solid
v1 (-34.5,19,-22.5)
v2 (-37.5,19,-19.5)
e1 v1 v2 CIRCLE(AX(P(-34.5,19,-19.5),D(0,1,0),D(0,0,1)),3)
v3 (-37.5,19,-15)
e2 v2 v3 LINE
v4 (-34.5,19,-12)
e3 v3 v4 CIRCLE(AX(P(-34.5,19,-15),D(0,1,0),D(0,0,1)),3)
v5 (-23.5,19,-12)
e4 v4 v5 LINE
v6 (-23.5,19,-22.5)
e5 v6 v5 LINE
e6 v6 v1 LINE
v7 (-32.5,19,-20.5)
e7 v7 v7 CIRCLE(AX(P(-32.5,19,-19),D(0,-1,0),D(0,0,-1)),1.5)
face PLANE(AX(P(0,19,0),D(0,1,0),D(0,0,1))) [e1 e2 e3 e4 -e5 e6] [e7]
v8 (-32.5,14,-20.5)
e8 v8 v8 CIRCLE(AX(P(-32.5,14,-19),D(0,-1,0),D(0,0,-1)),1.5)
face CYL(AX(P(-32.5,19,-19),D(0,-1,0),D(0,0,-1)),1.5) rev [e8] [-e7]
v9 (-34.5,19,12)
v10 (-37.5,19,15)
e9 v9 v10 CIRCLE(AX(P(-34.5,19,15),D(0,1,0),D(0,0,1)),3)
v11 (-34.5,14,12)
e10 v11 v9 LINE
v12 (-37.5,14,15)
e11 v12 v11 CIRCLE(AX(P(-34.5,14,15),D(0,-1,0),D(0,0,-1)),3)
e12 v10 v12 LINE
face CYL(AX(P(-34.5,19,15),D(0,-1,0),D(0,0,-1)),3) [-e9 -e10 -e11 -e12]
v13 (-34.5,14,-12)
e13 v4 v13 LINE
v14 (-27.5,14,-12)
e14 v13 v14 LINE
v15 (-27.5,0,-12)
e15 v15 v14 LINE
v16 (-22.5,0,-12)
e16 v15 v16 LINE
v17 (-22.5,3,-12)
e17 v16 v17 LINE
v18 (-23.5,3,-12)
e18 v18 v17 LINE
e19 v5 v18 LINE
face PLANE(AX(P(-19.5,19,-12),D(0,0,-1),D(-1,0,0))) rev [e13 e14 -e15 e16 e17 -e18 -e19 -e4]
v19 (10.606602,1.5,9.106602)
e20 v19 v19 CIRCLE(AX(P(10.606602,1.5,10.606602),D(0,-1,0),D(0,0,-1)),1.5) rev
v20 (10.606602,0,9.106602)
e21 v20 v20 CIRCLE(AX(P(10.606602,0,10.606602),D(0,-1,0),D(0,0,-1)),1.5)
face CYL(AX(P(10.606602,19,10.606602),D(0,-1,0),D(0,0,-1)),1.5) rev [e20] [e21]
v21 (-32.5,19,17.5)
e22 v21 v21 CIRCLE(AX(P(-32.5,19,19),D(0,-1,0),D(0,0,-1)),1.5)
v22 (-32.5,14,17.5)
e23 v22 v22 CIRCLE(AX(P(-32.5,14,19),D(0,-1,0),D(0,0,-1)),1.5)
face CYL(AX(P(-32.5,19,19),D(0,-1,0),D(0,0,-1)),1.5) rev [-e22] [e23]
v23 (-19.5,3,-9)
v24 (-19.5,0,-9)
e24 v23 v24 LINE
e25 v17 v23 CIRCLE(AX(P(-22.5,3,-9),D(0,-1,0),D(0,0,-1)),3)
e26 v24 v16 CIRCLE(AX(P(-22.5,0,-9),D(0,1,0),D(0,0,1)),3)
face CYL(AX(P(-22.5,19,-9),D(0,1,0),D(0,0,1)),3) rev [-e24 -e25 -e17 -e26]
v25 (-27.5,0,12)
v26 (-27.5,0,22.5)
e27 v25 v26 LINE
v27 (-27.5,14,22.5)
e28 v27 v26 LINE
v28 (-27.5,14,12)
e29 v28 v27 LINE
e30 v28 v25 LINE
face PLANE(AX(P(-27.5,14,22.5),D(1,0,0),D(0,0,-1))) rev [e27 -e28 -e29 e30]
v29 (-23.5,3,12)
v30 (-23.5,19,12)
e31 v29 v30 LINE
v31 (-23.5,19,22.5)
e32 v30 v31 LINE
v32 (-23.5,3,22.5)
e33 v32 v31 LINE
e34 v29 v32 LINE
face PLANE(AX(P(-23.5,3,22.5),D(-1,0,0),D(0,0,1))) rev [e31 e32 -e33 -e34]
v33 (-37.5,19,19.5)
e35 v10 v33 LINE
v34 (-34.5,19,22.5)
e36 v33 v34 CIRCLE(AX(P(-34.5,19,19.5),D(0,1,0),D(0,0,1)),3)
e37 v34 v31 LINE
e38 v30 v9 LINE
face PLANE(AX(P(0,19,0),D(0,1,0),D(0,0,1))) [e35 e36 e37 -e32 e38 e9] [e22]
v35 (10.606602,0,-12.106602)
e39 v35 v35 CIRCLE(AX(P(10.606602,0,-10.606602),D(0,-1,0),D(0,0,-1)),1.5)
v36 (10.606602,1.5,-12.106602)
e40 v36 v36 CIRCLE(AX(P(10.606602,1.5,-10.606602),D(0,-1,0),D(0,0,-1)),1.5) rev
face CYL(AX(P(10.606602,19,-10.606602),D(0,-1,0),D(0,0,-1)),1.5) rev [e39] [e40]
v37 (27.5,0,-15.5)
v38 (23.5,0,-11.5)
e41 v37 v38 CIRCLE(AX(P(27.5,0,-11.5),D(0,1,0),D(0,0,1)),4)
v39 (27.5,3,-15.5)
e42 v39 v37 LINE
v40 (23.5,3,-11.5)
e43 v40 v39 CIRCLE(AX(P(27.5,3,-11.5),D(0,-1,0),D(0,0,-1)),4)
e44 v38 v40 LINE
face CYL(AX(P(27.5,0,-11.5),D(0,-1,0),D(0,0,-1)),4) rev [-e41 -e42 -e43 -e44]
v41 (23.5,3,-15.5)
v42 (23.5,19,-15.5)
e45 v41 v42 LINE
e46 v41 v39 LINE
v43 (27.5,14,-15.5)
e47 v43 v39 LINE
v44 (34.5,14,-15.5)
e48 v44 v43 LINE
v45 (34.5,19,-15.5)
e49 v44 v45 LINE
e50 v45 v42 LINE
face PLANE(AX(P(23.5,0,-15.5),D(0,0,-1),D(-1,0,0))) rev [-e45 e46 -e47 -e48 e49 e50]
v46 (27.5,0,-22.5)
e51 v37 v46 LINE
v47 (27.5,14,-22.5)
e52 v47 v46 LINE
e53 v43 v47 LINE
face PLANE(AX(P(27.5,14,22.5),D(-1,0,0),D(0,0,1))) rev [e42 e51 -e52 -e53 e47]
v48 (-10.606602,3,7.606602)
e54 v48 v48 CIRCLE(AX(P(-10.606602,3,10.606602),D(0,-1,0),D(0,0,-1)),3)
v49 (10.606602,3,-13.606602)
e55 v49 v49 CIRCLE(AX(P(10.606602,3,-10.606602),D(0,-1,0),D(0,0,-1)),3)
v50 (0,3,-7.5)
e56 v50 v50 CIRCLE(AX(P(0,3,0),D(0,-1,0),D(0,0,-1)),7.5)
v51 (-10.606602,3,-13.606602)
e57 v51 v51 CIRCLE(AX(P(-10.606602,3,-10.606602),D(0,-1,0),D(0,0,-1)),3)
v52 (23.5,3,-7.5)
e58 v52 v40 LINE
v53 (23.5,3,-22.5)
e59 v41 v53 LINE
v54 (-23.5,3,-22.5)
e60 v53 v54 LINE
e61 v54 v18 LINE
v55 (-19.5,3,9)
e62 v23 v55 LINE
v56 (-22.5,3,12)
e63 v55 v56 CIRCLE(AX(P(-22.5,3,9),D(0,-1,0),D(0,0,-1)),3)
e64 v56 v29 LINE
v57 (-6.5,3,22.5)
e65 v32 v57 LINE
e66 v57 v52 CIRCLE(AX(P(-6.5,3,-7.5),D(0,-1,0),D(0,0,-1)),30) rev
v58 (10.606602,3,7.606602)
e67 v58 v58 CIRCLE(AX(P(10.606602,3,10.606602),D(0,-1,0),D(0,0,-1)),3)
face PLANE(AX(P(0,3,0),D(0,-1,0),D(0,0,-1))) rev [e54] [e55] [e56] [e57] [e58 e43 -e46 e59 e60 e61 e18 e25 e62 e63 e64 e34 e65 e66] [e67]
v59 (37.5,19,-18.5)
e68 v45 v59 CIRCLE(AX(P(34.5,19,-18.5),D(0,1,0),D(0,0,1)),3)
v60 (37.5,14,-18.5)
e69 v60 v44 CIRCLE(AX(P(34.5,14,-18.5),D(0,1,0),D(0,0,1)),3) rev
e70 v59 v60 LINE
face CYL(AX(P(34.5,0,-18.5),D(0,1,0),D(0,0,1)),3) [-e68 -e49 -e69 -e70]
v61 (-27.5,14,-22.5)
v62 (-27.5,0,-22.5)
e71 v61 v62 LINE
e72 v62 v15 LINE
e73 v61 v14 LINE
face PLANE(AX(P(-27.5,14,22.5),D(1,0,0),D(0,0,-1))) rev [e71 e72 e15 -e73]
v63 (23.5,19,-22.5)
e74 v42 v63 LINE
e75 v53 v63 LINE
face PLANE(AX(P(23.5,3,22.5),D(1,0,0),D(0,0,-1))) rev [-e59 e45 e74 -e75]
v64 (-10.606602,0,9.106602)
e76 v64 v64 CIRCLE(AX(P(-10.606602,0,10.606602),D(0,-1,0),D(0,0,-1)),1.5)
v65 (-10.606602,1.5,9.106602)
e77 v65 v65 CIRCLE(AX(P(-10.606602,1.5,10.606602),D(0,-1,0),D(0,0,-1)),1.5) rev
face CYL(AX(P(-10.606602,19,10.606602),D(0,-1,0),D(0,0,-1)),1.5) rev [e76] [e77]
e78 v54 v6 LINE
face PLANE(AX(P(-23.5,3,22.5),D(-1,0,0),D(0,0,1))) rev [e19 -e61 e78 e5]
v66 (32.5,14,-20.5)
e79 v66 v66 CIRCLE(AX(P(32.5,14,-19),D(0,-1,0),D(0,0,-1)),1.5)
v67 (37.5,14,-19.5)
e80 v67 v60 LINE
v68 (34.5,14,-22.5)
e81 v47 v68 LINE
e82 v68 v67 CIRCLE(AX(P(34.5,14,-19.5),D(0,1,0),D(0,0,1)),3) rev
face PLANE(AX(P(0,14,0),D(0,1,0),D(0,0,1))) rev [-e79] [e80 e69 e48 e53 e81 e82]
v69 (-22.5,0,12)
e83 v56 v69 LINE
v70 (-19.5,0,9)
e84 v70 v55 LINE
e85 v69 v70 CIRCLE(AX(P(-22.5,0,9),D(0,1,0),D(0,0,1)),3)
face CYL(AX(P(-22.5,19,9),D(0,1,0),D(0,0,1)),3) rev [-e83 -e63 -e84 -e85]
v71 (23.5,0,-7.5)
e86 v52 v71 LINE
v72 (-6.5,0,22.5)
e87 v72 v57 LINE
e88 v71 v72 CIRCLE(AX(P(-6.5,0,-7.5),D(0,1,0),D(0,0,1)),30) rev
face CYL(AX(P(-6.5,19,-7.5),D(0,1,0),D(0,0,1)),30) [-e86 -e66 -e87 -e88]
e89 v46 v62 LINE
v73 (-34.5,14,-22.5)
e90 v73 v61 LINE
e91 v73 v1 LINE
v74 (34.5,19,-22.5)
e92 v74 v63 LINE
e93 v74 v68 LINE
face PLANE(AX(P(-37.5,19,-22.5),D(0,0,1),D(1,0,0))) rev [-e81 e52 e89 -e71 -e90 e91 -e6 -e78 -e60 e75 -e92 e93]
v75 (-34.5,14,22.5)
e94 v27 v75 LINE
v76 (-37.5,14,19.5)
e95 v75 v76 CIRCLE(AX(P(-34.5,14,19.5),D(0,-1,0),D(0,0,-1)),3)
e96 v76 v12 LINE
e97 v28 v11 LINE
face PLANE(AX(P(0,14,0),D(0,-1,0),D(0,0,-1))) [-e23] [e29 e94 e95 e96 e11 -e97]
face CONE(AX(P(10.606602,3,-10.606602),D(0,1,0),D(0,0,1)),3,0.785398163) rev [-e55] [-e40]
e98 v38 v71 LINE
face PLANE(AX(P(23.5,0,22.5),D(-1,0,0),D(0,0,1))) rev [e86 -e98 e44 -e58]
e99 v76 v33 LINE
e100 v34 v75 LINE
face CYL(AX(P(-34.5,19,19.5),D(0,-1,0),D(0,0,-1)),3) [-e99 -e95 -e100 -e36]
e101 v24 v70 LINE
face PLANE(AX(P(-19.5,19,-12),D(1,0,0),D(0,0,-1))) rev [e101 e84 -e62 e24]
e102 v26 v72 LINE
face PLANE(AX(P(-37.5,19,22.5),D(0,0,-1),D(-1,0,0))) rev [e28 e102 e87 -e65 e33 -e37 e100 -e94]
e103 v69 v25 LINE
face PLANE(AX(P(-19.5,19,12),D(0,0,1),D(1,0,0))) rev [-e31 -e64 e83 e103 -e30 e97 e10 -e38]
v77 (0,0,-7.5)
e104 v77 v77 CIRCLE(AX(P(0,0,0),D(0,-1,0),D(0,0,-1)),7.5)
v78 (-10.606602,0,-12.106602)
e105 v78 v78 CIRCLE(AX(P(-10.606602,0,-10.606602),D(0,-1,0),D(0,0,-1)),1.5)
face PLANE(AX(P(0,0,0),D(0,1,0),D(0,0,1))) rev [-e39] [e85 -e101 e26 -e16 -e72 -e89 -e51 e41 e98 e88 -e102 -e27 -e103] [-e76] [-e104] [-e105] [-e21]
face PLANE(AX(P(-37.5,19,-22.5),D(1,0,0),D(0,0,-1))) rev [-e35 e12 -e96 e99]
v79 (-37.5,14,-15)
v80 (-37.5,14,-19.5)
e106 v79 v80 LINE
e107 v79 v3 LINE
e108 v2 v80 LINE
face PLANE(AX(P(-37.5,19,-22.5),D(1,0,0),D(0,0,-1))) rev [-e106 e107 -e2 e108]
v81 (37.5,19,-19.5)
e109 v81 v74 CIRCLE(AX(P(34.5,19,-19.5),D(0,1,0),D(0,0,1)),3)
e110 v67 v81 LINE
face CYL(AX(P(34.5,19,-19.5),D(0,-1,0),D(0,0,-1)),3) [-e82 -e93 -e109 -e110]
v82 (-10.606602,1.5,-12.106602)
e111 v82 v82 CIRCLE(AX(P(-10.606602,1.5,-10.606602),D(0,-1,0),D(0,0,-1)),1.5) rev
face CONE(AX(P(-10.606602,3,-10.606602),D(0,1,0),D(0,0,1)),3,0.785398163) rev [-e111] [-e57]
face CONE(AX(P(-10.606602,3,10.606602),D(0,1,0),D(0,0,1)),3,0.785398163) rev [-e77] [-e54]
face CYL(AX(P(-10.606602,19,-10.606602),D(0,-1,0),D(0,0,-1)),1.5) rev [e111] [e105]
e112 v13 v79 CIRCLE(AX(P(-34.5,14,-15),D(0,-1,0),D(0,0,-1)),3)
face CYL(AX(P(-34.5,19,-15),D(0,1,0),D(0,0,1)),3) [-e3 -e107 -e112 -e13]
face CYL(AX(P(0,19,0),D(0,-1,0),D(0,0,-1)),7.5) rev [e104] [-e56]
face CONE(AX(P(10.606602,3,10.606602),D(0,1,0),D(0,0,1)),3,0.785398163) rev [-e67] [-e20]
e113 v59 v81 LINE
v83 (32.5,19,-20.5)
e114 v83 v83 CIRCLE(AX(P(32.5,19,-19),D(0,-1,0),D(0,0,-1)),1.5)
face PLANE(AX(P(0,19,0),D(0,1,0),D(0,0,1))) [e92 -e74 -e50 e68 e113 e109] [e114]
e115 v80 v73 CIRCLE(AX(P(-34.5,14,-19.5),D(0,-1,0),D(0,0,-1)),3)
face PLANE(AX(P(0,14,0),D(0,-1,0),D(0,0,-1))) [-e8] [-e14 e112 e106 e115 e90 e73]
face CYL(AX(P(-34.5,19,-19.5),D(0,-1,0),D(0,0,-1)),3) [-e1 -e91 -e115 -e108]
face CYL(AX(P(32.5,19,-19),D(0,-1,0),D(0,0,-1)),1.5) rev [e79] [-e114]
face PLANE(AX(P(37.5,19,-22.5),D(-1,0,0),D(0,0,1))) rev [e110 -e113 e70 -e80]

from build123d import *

# Parameters (mm, degrees)
SKETCH_1_W          = 75
SKETCH_1_H          = 45
EXTRUDE_1_DEPTH     = 19
SKETCH_2_W          = 10
SKETCH_2_H          = 45
CUT_EXTRUDE_1_DEPTH = 14
SKETCH_3_W          = 47
SKETCH_3_H          = 45
CUT_EXTRUDE_2_DEPTH = 16
SKETCH_4_R          = 1.5
SKETCH_4_R_2        = 7.5
CUT_EXTRUDE_3_DEPTH = 48.681233206
SKETCH_5_W          = 14
SKETCH_5_H          = 38
CUT_EXTRUDE_4_DEPTH = 48.681233206
FILLET_1_R          = 30
CHAMFER_1_SIZE      = 1.5
SKETCH_8_W          = 36
SKETCH_8_H          = 24
CUT_EXTRUDE_6_DEPTH = 48.681233206
FILLET_2_R          = 3
SKETCH_9_R          = 1.5
CUT_EXTRUDE_7_DEPTH = 46.918405896
FILLET_3_R          = 3
FILLET_4_R          = 4


with BuildPart() as part:
    # 草图1 → 凸台-拉伸1 (new body)
    with BuildSketch(Plane(origin=(0, 0, 0), x_dir=(1, 0, 0), z_dir=(0, 1, 0))):
        Rectangle(SKETCH_1_W, SKETCH_1_H)
    extrude(amount=EXTRUDE_1_DEPTH)

    # 草图2 → 切除-拉伸1 (cut)
    with BuildSketch(Plane.XZ):
        with Locations((-32.5, 0)):
            Rectangle(SKETCH_2_W, SKETCH_2_H)
        with Locations((32.5, 0)):
            Rectangle(SKETCH_2_W, SKETCH_2_H)
    extrude(amount=-CUT_EXTRUDE_1_DEPTH, mode=Mode.SUBTRACT)

    # 草图3 → 切除-拉伸2 (cut)
    with BuildSketch(Plane(origin=(0, 19, 0), x_dir=(1, 0, 0), z_dir=(0, 1, 0))):
        Rectangle(SKETCH_3_W, SKETCH_3_H)
    extrude(amount=-CUT_EXTRUDE_2_DEPTH, mode=Mode.SUBTRACT)

    # 草图4 → 切除-拉伸3 (cut, through all)
    with BuildSketch(Plane.XZ):
        with Locations(Location((10.606601718, 10.606601718, 0), (0, 0, 270))):
            Circle(SKETCH_4_R)
        with Locations(Location((10.606601718, -10.606601718, 0), (0, 0, 270))):
            Circle(SKETCH_4_R)
        with Locations(Location((-10.606601718, -10.606601718, 0), (0, 0, 270))):
            Circle(SKETCH_4_R)
        with Locations(Location((-10.606601718, 10.606601718, 0), (0, 0, 270))):
            Circle(SKETCH_4_R)
        with Locations(Location((0, 0, 0), (0, 0, 270))):
            Circle(SKETCH_4_R_2)
    extrude(amount=-CUT_EXTRUDE_3_DEPTH, mode=Mode.SUBTRACT)

    # 草图5 → 切除-拉伸4 (cut, through all)
    with BuildSketch(Plane(origin=(0, 19, 0), x_dir=(1, 0, 0), z_dir=(0, 1, 0))):
        with Locations((30.5, -3.5)):
            Rectangle(SKETCH_5_W, SKETCH_5_H)
    extrude(amount=-CUT_EXTRUDE_4_DEPTH, mode=Mode.SUBTRACT)

    # 圆角1
    fillet_1_edges = [part.edges().sort_by_distance(p)[0] for p in [
        (23.5, 1.5, 22.5),
    ]]
    fillet(fillet_1_edges, radius=FILLET_1_R)

    # 倒角1
    chamfer_1_edges = [part.edges().sort_by_distance(p)[0] for p in [
        (-10.606601718, 3, 12.106601718),
        (-10.606601718, 3, -9.106601718),
        (10.606601718, 3, -9.106601718),
        (10.606601718, 3, 12.106601718),
    ]]
    chamfer(chamfer_1_edges, length=CHAMFER_1_SIZE)

    # 草图8 → 切除-拉伸6 (cut, through all)
    with BuildSketch(Plane.XZ):
        with Locations((-37.5, 0)):
            Rectangle(SKETCH_8_W, SKETCH_8_H)
    extrude(amount=-CUT_EXTRUDE_6_DEPTH, mode=Mode.SUBTRACT)

    # 圆角2
    fillet_2_edges = [part.edges().sort_by_distance(p)[0] for p in [
        (-19.5, 1.5, 12),
        (-19.5, 1.5, -12),
    ]]
    fillet(fillet_2_edges, radius=FILLET_2_R)

    # 草图9 → 切除-拉伸7 (cut, through all)
    with BuildSketch(Plane.XZ.offset(-14)):
        with Locations(Location((32.5, -19, 0), (0, 0, 270))):
            Circle(SKETCH_9_R)
        with Locations(Location((-32.5, -19, 0), (0, 0, 270))):
            Circle(SKETCH_9_R)
        with Locations(Location((-32.5, 19, 0), (0, 0, 270))):
            Circle(SKETCH_9_R)
    extrude(amount=-CUT_EXTRUDE_7_DEPTH, mode=Mode.SUBTRACT)

    # 圆角3
    fillet_3_edges = [part.edges().sort_by_distance(p)[0] for p in [
        (-37.5, 16.5, 12),
        (-37.5, 16.5, -12),
        (-37.5, 16.5, 22.5),
        (-37.5, 16.5, -22.5),
        (37.5, 16.5, -22.5),
        (37.5, 16.5, -15.5),
    ]]
    fillet(fillet_3_edges, radius=FILLET_3_R)

    # 圆角4
    fillet_4_edges = [part.edges().sort_by_distance(p)[0] for p in [
        (23.5, 1.5, -15.5),
    ]]
    fillet(fillet_4_edges, radius=FILLET_4_R - 0.0001)  # a hair under: the kernel refuses the full size


solid = part.part
